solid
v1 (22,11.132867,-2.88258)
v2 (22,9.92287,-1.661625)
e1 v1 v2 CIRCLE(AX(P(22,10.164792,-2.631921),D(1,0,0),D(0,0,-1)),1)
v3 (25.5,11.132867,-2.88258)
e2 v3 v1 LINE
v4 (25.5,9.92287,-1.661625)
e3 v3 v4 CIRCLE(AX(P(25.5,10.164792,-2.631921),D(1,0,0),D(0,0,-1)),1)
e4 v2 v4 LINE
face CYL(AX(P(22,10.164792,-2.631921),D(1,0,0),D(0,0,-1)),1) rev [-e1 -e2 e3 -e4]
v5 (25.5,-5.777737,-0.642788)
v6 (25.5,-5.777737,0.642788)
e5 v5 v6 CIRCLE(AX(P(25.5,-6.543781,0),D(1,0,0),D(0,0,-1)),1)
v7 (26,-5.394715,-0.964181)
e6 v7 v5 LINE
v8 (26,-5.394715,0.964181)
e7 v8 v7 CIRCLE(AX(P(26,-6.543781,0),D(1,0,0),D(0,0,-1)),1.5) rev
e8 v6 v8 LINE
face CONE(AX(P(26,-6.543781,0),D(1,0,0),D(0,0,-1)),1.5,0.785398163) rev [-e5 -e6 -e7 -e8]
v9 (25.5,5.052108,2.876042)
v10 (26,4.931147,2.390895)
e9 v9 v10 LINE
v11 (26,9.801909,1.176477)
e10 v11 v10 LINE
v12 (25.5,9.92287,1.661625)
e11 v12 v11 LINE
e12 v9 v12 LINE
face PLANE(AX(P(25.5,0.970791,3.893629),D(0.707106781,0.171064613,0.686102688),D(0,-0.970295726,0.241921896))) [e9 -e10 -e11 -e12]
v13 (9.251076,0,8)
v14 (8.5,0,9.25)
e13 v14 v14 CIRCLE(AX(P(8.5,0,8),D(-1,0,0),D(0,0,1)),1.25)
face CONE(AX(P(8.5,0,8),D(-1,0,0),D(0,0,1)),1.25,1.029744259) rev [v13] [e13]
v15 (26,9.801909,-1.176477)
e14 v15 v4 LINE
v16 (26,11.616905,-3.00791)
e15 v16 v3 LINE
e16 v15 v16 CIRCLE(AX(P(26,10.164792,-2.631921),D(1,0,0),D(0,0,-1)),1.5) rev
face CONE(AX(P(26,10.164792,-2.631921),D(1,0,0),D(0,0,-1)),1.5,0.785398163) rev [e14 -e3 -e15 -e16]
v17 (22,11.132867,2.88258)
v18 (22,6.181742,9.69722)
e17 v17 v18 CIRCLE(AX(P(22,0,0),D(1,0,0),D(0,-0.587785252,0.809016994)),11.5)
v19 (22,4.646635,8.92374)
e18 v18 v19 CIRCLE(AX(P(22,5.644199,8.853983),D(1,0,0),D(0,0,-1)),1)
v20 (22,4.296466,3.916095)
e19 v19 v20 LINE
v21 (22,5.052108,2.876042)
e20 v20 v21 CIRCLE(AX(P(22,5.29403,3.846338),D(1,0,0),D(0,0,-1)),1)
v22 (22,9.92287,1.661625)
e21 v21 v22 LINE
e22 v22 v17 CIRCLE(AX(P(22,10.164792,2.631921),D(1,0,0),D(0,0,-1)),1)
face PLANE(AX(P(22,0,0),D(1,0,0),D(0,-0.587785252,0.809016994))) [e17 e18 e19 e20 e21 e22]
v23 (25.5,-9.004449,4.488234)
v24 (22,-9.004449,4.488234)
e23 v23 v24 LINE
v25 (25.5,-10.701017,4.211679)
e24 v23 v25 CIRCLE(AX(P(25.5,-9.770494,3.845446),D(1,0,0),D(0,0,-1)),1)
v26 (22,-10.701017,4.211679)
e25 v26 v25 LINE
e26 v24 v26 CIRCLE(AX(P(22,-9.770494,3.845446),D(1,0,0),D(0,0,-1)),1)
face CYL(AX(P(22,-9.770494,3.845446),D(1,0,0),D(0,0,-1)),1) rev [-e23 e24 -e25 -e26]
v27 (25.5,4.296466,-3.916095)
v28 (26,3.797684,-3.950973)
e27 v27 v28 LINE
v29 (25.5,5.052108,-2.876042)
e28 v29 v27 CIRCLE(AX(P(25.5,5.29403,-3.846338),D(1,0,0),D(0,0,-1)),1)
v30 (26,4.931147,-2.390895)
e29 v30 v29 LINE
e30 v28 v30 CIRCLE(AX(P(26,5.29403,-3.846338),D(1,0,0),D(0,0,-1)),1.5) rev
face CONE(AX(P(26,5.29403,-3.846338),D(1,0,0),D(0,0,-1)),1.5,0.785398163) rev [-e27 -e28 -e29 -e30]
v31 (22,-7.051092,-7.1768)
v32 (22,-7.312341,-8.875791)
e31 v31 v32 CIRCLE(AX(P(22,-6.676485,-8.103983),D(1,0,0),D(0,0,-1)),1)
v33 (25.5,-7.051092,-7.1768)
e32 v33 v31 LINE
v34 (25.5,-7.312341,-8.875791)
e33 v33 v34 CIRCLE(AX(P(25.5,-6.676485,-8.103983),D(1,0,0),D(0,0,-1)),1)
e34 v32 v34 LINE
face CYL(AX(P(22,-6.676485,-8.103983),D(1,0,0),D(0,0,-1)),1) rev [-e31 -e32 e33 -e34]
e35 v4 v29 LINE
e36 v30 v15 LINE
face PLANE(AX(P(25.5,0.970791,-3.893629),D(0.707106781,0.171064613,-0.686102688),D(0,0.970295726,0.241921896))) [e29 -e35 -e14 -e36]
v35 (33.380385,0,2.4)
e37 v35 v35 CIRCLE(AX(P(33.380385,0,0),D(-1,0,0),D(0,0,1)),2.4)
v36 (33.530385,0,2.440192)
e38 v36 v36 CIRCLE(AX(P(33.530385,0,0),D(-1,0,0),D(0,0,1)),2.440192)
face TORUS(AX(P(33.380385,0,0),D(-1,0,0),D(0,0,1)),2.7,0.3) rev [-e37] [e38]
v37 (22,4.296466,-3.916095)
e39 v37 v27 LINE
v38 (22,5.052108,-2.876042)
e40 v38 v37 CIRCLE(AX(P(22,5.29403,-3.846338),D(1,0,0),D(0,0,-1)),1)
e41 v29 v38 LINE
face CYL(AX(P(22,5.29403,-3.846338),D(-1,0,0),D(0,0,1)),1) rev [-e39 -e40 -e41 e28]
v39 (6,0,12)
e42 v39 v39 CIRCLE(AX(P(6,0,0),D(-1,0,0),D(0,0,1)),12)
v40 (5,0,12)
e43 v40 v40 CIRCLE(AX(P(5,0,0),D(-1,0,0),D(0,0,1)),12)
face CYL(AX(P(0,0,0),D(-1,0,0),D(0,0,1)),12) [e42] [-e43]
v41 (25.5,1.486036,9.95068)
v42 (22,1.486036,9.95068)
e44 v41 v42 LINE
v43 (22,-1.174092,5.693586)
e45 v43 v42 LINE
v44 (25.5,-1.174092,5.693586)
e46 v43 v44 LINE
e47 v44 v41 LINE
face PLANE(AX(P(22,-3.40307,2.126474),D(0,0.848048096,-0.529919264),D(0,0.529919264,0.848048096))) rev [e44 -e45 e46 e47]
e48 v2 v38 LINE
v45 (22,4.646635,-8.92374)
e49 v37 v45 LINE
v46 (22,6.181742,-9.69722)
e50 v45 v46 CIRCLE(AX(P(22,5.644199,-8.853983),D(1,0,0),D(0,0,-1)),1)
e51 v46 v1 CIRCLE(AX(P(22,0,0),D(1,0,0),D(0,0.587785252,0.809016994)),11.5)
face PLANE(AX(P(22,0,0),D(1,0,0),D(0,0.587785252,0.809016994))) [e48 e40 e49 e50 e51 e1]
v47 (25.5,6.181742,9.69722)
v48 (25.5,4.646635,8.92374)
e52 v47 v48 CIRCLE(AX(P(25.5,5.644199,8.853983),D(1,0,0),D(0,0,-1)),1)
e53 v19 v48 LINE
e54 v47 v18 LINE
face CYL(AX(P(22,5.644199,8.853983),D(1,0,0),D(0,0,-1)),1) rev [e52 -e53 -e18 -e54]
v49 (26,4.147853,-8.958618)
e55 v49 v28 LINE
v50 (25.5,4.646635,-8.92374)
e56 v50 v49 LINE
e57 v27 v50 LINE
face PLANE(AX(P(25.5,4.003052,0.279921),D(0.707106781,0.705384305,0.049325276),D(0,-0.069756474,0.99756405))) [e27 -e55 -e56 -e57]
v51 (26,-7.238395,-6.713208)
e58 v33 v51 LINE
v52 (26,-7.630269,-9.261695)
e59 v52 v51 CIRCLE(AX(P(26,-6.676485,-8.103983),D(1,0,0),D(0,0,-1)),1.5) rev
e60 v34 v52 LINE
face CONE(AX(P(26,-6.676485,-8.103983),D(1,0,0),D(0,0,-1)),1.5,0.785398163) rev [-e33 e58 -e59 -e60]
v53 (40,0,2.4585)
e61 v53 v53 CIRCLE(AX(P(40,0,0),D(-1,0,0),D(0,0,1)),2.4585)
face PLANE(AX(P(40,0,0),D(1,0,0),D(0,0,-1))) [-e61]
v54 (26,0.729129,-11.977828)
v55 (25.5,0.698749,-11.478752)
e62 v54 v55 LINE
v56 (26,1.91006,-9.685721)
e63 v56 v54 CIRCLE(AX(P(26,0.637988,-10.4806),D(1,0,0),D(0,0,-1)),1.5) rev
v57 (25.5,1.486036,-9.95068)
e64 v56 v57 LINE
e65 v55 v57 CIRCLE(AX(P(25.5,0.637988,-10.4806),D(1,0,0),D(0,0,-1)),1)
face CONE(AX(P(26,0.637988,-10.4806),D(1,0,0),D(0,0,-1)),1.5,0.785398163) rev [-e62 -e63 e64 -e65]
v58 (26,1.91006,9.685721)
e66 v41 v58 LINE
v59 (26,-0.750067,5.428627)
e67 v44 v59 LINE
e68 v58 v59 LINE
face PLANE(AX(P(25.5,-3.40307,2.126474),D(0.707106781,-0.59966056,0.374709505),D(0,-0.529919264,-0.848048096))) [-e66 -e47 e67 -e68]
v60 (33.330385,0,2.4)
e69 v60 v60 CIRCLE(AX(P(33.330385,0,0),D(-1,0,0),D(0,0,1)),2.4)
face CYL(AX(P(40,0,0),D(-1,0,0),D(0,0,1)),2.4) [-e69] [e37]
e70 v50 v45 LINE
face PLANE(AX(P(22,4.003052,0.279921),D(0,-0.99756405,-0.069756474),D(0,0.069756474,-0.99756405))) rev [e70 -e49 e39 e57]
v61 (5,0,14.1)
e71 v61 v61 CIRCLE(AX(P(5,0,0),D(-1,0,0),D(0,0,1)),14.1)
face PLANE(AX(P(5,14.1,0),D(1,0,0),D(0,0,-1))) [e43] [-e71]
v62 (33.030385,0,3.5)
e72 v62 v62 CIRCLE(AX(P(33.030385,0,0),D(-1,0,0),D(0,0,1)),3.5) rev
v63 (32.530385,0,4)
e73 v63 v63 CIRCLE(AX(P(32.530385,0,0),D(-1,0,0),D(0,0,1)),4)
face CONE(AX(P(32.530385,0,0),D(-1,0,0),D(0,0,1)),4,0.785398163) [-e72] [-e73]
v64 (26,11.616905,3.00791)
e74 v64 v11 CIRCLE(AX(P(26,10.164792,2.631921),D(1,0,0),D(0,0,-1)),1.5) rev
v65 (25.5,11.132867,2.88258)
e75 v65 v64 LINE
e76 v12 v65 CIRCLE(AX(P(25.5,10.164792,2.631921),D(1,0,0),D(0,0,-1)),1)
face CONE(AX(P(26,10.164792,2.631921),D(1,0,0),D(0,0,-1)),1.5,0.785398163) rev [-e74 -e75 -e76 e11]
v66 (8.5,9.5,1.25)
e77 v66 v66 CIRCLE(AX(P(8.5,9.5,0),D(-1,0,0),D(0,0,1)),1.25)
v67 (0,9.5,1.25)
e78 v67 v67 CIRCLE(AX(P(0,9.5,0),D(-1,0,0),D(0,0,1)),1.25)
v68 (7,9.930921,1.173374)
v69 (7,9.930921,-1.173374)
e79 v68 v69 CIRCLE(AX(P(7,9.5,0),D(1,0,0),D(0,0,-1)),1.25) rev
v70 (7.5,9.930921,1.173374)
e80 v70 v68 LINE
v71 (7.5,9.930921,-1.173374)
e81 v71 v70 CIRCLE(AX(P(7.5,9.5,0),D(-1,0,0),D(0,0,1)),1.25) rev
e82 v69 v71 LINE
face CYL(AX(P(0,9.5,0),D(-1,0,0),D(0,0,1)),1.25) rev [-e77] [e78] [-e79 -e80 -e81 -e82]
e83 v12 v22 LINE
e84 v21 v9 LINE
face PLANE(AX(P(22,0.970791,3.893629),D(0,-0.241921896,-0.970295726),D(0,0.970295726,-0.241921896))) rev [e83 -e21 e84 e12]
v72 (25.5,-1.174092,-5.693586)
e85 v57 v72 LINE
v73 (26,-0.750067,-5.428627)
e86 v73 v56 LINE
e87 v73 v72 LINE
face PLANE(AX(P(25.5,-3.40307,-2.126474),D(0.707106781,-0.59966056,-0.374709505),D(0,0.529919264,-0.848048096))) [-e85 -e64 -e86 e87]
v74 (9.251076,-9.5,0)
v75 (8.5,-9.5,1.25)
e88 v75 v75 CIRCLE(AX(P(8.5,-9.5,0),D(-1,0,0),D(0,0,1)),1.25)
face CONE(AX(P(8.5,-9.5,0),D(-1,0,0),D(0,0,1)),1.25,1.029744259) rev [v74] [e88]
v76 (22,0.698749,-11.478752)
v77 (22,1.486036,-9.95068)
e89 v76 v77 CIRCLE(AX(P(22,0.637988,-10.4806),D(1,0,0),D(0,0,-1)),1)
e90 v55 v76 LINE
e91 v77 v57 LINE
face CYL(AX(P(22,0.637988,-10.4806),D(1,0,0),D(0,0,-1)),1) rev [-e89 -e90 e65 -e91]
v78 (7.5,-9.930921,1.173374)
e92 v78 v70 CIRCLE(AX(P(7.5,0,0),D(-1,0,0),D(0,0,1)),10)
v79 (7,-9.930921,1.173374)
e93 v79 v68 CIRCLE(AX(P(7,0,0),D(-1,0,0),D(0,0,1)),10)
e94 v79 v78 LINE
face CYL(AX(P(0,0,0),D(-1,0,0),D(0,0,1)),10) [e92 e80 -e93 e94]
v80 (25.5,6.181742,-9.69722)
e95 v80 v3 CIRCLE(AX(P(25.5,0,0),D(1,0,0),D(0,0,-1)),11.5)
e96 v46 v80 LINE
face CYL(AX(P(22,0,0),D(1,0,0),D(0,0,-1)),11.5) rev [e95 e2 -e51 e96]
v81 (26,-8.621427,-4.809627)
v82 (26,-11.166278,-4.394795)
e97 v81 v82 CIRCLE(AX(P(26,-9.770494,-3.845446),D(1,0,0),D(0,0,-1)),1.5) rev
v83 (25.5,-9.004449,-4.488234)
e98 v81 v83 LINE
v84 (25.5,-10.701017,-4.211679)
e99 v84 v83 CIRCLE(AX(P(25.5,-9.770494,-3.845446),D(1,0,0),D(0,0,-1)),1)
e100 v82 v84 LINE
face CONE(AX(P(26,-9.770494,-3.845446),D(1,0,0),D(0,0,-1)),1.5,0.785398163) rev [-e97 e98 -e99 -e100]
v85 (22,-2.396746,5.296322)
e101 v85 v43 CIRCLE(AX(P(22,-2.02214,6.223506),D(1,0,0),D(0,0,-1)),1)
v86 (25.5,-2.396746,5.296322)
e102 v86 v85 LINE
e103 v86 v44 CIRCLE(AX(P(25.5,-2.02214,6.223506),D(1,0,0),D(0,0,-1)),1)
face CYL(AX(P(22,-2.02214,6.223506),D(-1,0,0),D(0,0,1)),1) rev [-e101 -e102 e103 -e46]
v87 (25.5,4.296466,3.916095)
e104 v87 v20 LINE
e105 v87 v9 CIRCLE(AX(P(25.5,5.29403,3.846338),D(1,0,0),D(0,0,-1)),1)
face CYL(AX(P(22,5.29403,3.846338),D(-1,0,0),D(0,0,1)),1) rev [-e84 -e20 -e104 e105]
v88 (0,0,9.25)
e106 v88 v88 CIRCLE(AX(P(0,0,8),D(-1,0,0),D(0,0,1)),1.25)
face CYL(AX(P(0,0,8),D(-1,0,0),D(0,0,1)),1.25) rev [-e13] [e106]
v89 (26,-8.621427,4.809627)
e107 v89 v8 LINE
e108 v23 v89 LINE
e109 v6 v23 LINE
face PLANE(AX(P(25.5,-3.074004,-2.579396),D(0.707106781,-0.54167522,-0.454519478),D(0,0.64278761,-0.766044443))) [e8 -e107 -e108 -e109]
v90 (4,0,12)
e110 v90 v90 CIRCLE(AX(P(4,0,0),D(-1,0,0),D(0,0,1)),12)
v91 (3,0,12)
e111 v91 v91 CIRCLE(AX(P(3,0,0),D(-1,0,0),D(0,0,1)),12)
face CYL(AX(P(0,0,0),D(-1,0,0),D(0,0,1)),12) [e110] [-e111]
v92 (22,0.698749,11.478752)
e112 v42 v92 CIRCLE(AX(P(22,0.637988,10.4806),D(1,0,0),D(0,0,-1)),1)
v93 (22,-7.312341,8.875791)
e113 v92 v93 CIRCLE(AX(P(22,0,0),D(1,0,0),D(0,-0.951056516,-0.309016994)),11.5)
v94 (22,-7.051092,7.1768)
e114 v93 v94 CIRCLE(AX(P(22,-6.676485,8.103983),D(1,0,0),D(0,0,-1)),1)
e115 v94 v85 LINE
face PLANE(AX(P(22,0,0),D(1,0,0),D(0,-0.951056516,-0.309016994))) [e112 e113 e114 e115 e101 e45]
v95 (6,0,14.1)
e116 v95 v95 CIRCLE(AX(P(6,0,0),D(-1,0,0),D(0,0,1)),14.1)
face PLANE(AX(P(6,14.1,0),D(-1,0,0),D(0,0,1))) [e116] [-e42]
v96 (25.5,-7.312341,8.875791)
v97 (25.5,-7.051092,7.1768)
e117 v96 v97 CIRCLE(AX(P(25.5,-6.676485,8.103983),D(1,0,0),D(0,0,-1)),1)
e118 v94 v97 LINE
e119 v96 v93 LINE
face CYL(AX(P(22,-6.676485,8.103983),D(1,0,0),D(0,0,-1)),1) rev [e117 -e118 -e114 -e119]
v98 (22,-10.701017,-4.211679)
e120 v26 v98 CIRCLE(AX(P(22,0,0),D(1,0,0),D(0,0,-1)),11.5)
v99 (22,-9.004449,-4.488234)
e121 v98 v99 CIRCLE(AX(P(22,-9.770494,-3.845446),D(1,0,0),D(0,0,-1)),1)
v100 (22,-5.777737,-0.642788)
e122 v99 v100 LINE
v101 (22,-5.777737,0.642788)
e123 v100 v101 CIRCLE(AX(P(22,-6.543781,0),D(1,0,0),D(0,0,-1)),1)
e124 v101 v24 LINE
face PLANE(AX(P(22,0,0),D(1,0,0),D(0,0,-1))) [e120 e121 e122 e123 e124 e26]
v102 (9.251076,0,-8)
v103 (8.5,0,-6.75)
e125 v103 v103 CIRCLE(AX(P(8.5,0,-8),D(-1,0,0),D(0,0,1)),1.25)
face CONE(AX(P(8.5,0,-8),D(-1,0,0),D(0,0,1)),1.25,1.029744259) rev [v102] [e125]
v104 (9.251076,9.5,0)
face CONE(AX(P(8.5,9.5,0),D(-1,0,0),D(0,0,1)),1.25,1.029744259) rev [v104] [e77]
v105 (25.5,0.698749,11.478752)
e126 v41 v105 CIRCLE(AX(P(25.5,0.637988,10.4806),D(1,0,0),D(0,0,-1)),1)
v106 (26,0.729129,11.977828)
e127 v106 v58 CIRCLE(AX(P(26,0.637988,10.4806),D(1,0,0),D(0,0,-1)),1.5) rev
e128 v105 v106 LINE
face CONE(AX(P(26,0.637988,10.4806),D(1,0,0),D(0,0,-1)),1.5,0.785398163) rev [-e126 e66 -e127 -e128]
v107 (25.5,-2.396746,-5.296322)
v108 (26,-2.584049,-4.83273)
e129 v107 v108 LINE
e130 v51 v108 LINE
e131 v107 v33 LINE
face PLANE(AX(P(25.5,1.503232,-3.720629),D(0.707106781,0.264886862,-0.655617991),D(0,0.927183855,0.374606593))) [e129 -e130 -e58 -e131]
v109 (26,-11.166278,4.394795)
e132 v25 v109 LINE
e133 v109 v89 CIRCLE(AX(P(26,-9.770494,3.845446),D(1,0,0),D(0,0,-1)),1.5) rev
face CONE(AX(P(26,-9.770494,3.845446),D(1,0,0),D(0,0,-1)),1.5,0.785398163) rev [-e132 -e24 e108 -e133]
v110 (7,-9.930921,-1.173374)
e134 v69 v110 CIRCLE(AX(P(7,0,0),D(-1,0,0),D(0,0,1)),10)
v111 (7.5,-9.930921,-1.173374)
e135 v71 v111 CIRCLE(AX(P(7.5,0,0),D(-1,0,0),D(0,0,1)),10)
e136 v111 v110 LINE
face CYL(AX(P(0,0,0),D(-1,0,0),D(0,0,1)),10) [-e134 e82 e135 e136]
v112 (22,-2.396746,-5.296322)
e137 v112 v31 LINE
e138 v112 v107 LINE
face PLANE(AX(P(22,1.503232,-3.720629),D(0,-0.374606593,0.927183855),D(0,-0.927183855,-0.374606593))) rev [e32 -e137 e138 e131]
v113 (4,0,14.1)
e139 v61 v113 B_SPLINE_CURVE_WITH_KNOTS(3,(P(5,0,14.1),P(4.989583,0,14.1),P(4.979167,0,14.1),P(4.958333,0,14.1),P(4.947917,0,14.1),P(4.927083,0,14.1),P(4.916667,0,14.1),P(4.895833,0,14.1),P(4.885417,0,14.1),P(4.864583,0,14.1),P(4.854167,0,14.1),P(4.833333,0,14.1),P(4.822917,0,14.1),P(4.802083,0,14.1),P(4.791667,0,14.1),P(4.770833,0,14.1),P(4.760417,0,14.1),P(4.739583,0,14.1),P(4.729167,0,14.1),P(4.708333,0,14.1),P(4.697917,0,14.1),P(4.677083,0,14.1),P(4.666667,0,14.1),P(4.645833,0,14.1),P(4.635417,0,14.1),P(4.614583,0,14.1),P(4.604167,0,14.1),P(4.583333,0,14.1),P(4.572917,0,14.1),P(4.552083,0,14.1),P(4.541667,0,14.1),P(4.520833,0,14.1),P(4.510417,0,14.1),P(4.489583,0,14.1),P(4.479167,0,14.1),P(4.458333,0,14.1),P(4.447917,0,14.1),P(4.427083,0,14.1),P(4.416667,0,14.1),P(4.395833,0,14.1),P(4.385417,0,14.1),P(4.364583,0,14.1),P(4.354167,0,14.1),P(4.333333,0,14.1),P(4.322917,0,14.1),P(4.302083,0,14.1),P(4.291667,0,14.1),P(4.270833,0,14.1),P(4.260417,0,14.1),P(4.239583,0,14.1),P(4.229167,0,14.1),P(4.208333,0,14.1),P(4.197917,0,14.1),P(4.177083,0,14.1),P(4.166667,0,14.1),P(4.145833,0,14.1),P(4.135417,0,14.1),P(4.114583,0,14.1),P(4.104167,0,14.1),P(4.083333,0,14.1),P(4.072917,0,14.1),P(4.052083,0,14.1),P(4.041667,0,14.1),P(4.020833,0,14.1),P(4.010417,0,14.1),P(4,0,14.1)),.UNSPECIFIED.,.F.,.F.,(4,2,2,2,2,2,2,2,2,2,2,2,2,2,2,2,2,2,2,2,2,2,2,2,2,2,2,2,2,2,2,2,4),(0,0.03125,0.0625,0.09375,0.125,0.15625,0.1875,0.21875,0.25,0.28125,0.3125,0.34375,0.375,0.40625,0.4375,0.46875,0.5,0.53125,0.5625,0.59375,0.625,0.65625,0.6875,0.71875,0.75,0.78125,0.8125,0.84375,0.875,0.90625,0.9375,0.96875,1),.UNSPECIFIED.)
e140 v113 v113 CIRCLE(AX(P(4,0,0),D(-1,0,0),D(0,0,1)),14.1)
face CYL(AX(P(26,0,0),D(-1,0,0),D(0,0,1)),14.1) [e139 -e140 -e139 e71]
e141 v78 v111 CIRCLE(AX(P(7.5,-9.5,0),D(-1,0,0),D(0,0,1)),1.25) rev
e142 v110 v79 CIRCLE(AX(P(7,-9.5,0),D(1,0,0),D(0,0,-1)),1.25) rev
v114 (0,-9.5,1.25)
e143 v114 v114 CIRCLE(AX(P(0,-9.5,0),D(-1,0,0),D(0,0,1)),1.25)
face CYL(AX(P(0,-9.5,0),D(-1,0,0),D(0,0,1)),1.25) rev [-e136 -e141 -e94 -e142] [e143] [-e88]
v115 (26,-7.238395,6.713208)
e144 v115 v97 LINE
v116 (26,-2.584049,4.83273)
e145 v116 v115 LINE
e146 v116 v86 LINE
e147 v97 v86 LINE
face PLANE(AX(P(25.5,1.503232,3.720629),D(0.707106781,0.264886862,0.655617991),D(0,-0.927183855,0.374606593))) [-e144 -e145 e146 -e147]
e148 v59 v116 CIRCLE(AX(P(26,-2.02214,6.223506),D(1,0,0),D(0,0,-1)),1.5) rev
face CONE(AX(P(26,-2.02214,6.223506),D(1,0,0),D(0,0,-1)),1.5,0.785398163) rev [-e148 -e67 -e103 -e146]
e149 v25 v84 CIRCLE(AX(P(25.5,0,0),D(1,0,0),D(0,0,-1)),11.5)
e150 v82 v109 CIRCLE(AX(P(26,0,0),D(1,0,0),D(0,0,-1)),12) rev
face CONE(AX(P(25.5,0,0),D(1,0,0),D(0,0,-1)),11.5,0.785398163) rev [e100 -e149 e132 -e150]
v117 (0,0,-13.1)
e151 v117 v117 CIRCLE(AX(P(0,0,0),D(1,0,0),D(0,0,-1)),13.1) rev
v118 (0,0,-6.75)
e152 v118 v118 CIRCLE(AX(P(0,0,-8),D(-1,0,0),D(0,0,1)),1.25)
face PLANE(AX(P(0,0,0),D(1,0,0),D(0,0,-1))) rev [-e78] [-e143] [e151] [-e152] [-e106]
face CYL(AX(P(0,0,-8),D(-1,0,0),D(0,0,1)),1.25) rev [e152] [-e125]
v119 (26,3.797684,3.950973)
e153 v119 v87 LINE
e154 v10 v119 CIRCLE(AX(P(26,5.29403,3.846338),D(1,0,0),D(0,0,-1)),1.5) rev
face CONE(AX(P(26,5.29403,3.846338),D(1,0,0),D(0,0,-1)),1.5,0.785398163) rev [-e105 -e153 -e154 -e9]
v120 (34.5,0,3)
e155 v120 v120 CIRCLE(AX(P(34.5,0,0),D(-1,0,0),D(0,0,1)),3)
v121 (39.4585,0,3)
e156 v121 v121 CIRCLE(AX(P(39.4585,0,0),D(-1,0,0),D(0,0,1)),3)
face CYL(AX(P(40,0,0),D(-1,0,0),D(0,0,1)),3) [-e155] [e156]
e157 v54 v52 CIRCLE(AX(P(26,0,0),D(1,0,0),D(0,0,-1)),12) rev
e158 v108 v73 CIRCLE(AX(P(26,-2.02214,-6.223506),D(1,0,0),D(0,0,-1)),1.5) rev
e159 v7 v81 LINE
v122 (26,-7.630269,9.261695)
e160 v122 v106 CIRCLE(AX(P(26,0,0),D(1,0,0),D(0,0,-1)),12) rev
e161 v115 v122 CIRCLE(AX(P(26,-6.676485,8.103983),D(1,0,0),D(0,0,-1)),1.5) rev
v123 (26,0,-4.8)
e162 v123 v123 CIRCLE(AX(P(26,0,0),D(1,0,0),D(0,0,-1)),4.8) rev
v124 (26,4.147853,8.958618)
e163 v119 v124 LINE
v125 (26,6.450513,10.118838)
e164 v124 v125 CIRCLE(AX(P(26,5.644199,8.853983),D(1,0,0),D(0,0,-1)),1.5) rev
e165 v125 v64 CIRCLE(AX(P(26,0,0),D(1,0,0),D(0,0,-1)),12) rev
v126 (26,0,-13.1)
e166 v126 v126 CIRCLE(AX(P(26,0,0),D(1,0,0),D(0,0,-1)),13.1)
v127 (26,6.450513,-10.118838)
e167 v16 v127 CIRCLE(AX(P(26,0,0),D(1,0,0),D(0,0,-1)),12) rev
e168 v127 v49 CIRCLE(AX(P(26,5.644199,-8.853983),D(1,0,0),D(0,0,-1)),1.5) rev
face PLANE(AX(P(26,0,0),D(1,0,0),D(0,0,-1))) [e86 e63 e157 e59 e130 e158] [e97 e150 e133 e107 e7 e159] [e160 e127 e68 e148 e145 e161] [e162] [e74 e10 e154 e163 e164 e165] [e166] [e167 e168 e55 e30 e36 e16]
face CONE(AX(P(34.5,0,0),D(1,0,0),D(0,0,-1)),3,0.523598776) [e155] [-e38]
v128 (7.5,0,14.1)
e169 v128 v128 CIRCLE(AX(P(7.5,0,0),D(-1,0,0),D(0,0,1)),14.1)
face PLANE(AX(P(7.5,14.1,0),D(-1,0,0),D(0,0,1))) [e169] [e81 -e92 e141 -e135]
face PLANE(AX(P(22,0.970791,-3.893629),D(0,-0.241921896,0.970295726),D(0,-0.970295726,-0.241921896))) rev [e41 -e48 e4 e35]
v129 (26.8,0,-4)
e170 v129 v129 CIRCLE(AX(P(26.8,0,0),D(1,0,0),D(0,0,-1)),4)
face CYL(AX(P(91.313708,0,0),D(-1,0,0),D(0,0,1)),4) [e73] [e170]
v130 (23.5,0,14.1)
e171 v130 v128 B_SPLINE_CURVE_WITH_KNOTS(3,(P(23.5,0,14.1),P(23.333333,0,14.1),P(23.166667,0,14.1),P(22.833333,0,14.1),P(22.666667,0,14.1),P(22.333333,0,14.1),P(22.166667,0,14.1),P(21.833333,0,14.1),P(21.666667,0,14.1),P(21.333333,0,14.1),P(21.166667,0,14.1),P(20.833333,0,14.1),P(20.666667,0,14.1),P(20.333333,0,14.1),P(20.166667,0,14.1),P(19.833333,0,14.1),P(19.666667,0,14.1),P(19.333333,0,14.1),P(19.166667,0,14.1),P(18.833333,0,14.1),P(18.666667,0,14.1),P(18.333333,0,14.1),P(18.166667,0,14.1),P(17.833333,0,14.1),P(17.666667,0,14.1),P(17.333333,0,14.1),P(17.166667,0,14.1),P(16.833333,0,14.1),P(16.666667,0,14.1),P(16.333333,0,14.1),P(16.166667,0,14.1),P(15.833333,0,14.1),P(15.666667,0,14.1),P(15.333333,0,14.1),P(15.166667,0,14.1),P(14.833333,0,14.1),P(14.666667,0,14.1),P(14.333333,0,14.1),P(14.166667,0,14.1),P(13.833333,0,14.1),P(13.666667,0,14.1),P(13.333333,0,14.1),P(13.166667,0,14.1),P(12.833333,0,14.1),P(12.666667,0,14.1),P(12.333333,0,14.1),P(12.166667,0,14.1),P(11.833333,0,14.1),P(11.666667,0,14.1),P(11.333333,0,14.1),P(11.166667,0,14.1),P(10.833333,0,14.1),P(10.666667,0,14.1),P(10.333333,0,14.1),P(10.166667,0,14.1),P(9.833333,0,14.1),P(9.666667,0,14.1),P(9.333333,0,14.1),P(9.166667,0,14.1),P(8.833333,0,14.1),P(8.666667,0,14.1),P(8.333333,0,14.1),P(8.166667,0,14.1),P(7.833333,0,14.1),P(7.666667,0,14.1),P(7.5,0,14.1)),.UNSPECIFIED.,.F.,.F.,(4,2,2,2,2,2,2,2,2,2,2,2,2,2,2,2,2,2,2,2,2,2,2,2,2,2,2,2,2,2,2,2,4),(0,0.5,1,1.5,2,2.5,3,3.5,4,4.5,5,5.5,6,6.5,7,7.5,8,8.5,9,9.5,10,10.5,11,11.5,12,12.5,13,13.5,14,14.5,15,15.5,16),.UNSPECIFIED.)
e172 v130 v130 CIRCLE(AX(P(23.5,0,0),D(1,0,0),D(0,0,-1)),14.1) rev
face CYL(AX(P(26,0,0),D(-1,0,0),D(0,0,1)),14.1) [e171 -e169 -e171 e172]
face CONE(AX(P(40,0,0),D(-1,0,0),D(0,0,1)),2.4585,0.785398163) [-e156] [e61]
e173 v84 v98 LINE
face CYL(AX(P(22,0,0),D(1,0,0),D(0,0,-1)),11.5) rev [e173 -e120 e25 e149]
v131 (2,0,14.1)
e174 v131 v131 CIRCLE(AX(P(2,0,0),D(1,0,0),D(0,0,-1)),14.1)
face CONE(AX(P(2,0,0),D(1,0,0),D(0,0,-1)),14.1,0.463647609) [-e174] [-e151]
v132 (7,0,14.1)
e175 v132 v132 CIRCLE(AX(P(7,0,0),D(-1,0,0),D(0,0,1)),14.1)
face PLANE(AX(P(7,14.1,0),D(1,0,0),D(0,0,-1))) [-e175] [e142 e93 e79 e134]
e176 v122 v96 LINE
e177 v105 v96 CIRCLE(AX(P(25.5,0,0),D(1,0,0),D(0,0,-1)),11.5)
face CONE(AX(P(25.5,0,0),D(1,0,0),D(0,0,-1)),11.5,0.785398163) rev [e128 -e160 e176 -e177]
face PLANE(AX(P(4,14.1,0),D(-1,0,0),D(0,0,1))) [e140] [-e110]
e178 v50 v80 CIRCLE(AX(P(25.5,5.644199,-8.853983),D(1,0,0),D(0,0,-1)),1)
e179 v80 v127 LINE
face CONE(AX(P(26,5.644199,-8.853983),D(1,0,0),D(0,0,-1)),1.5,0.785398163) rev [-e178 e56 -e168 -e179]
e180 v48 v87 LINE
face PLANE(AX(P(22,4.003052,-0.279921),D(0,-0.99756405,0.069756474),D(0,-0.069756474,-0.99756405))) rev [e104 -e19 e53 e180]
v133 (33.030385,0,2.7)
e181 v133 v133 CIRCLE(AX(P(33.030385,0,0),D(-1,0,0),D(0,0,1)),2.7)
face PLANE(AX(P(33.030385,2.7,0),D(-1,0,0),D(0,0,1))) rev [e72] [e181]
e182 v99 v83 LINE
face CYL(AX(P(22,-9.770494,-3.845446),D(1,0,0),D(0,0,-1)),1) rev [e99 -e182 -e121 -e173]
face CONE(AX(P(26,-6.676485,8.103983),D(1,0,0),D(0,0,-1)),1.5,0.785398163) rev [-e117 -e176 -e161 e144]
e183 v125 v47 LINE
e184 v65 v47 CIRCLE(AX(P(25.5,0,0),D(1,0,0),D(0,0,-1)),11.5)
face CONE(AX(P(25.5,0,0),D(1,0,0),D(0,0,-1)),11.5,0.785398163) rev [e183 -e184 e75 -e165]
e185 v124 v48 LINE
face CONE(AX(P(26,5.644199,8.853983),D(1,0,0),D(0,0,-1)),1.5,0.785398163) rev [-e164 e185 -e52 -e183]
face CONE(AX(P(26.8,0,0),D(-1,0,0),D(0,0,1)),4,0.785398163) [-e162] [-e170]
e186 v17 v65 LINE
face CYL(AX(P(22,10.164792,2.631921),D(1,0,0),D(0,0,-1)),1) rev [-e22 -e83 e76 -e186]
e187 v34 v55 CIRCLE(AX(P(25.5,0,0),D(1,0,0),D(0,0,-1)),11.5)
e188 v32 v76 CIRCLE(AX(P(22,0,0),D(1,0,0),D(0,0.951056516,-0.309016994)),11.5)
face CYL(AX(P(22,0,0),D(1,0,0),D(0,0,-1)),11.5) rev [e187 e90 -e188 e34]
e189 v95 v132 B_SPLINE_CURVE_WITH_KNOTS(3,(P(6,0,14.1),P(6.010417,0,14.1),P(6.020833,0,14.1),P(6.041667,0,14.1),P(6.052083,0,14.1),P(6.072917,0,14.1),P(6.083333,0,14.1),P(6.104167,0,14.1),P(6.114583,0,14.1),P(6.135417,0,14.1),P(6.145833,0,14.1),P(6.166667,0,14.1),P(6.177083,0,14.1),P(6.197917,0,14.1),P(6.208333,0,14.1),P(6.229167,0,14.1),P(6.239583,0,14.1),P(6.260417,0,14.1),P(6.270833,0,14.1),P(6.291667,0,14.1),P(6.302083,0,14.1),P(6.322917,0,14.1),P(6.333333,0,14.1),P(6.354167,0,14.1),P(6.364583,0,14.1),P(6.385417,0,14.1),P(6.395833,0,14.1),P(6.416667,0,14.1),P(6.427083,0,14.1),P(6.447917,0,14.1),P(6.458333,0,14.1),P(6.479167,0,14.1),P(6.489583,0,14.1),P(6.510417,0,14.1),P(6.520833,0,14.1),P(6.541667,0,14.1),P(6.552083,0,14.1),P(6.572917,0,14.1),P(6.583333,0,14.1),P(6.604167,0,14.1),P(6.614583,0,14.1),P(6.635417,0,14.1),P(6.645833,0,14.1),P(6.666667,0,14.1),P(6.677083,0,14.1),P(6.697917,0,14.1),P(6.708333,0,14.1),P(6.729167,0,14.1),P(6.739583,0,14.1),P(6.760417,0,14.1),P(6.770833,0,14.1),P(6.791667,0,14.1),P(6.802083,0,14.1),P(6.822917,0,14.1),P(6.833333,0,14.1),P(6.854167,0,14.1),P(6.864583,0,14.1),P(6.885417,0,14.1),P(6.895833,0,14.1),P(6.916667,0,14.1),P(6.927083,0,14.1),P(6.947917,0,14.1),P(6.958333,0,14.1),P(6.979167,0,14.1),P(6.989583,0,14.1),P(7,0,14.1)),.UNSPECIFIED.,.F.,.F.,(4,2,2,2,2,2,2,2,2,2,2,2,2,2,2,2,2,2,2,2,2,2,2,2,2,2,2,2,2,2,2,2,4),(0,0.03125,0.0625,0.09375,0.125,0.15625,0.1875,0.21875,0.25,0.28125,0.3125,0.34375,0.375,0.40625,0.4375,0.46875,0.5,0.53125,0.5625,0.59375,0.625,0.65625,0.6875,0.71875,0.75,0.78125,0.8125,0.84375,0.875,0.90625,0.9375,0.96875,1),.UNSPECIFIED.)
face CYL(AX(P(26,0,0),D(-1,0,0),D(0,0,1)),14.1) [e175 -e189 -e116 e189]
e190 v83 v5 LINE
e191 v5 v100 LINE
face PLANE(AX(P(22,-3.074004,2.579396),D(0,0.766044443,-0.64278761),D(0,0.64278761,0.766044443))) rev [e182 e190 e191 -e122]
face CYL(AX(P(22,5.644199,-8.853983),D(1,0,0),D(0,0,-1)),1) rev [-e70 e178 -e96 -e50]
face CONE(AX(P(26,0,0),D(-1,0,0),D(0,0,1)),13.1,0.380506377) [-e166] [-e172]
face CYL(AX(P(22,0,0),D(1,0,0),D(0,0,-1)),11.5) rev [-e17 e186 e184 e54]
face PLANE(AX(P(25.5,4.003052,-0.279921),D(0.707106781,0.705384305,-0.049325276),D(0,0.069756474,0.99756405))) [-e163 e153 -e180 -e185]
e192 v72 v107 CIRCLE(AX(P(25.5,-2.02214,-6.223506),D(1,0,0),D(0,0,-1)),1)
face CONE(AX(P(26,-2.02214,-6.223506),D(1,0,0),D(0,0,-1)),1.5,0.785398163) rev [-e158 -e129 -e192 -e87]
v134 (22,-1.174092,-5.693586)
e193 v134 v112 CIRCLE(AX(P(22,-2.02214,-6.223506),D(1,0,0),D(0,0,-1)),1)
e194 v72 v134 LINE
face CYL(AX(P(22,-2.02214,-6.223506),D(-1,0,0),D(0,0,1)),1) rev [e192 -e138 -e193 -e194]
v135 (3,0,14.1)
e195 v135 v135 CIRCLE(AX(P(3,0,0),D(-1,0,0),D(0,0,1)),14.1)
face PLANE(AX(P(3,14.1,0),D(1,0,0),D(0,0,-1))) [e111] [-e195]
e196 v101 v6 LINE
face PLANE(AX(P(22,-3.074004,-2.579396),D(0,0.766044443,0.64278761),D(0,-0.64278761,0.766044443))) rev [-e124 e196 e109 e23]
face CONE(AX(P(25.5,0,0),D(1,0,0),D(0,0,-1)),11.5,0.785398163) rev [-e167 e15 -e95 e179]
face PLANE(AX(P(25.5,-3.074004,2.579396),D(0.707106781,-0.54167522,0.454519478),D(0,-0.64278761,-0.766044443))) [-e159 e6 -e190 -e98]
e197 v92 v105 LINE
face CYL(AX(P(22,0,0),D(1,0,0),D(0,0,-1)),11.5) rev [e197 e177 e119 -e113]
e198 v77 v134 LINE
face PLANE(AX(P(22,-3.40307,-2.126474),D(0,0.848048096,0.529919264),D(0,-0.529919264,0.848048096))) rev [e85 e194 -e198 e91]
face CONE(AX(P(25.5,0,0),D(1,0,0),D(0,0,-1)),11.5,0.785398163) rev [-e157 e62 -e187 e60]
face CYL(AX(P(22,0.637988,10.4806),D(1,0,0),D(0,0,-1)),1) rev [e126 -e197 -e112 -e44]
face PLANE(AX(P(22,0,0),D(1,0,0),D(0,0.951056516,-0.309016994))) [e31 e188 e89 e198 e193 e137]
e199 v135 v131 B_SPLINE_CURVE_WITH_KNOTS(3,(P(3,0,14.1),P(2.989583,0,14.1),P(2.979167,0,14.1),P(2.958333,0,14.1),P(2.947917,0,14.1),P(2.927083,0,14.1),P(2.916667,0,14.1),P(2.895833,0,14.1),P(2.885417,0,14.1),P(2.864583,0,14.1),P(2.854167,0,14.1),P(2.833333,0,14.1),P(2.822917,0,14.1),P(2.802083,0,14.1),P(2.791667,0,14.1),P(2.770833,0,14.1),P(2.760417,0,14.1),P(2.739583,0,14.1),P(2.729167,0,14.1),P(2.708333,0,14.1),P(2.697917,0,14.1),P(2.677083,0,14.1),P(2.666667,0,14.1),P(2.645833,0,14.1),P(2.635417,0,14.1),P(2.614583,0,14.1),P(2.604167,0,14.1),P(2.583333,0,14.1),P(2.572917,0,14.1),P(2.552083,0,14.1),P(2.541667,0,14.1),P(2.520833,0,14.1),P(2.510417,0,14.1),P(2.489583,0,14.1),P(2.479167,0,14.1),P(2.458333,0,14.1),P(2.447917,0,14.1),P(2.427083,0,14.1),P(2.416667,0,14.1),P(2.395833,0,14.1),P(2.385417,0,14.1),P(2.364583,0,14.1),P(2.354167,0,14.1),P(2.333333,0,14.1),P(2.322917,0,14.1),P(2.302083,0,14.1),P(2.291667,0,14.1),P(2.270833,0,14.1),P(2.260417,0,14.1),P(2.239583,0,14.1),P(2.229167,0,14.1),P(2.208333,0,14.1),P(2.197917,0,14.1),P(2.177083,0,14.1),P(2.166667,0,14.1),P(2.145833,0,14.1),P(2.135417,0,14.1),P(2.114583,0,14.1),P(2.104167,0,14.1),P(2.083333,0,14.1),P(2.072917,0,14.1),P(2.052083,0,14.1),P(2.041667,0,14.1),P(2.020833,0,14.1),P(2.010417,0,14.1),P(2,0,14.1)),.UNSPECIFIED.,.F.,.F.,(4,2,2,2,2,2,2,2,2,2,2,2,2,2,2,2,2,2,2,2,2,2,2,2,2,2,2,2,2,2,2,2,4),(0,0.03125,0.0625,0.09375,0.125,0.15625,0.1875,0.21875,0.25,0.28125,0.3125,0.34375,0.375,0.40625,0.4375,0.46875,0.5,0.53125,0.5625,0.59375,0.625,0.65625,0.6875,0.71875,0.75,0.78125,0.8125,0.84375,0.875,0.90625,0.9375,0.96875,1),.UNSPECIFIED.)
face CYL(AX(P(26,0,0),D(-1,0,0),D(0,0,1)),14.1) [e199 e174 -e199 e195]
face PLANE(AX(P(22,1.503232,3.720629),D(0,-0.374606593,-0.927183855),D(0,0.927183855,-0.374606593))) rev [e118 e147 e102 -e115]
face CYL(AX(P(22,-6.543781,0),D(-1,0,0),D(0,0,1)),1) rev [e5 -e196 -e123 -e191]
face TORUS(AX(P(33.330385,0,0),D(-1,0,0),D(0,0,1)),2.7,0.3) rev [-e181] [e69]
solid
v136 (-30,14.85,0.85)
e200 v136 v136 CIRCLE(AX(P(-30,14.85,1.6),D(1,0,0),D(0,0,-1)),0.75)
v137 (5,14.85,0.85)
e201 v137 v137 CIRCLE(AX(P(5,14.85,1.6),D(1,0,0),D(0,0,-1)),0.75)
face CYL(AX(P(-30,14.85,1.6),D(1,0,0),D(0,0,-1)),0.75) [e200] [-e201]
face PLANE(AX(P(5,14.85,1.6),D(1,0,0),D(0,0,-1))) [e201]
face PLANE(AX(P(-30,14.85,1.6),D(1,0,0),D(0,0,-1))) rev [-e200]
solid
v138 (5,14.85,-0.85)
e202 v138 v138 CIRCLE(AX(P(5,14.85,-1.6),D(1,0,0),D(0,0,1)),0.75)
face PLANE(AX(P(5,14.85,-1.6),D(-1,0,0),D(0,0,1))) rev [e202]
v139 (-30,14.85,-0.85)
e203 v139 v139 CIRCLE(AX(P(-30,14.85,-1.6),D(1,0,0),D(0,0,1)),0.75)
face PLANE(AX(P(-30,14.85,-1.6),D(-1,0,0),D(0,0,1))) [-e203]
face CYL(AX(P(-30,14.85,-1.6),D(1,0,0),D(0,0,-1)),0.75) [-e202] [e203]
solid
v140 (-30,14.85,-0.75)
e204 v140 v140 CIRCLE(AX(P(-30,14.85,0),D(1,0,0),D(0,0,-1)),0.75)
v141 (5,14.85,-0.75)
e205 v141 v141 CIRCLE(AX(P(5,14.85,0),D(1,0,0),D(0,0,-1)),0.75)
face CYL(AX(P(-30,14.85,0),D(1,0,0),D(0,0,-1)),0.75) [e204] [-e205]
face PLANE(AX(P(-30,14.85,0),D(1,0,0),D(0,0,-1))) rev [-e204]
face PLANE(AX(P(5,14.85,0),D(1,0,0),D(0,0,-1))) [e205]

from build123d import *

# Parameters (mm, degrees)
SKETCH_1_R                       = 14.1
EXTRUDE_1_DEPTH                  = 26
SKETCH_2_R                       = 4
EXTRUDE_2_DEPTH                  = 14
CHAMFER1_SIZE                    = 0.8
CHAMFER4_SIZE                    = 0.5
HOLE_WIZARD_M3_1_D               = 2.5
HOLE_WIZARD_M3_1_DEPTH           = 8.5
HOLE_WIZARD_M3_1_TIP             = 0.751075774
CHAMFER_1_SIZE                   = 2.5
CHAMFER_1_SIZE2                  = 1
CUT_EXTRUDE_1_DEPTH              = 4
FILLET_1_R                       = 1
PATTERN_CIRCULAR_1_COUNT         = 5
FILLET_1_OF_PATTERN_CIRCULAR_1_R = 1
CHAMFER2_SIZE                    = 0.5
SKETCH2_W                        = 0.5
SKETCH2_H                        = 4.1
SKETCH2_W_2                      = 1
SKETCH2_H_2                      = 2.1
CHAMFER3_SIZE                    = 1
CHAMFER3_SIZE2                   = 2
EXTRUDE_3_DEPTH                  = 5
EXTRUDE_3_DEPTH_BACK             = 30
SKETCH_9_R                       = 0.75
EXTRUDE_3_2_DEPTH                = 5
EXTRUDE_3_2_DEPTH_BACK           = 30
EXTRUDE_3_3_DEPTH                = 5
EXTRUDE_3_3_DEPTH_BACK           = 30


# Read off the part's stored shape, not the designer's step: M6 Machine Threads Stud1
with BuildPart() as part:
    # 草图1 → 凸台-拉伸1 (new body)
    with BuildSketch(Plane(origin=(0, 0, 0), x_dir=(0, 0, -1), z_dir=(1, 0, 0))):
        with Locations(Location((0, 0, 0), (0, 0, 180))):
            Circle(SKETCH_1_R)
    extrude(amount=EXTRUDE_1_DEPTH)

    # 草图2 → 凸台-拉伸2 (add)
    with BuildSketch(Plane(origin=(26, 0, 0), x_dir=(0, 0, -1), z_dir=(1, 0, 0))):
        Circle(SKETCH_2_R)
    extrude(amount=EXTRUDE_2_DEPTH)

    # M6 Machine Threads Stud1 outline → M6 Machine Threads Stud1 (revolve, cut)
    with BuildSketch(Plane.YX):
        with BuildLine():
            Line((4, 40), (2.4585, 40))
            Line((2.4585, 40), (3, 39.4585))
            Line((3, 39.4585), (3, 34.5))
            Line((3, 34.5), (2.440192379, 33.530384758))
            ThreePointArc((2.440192379, 33.530384758), (2.410222252, 33.458030472), (2.4, 33.380384758))
            Line((2.4, 33.380384758), (2.4, 33.330384758))
            ThreePointArc((2.4, 33.330384758), (2.487867965, 33.118252723), (2.7, 33.030384758))
            Line((2.7, 33.030384758), (4, 33.030384758))
            Line((4, 33.030384758), (4, 40))
        make_face()
    revolve(axis=Axis((0, 0, 0), (1, 0, 0)), mode=Mode.SUBTRACT)

    # Chamfer1
    chamfer1_edges = [part.edges().sort_by_distance(p)[0] for p in [
        (26, 0, 4),
    ]]
    chamfer(chamfer1_edges, length=CHAMFER1_SIZE)

    # Chamfer4
    chamfer4_edges = [part.edges().sort_by_distance(p)[0] for p in [
        (33.030384758, 0, 4),
    ]]
    chamfer(chamfer4_edges, length=CHAMFER4_SIZE)

    # M3 螺纹孔1
    with Locations(Plane.ZY):
        with Locations((8, 0), (0, 9.5), (0, -9.5), (-8, 0)):
            Hole(HOLE_WIZARD_M3_1_D / 2, depth=HOLE_WIZARD_M3_1_DEPTH)
            with Locations((0, 0, -(HOLE_WIZARD_M3_1_DEPTH + HOLE_WIZARD_M3_1_TIP / 2))):  # 118° drill point
                Cone(0, HOLE_WIZARD_M3_1_D / 2, HOLE_WIZARD_M3_1_TIP, mode=Mode.SUBTRACT)

    # 倒角1
    chamfer_1_edges = [part.edges().sort_by_distance(p)[0] for p in [
        (26, 0, -14.1),
    ]]
    chamfer_1_side = [part.faces().sort_by_distance(p)[0] for p in [
        (13, 0, -14.1),
    ]]
    chamfer(chamfer_1_edges, length=CHAMFER_1_SIZE, length2=CHAMFER_1_SIZE2, reference=chamfer_1_side[0])

    # 草图8 → 切除-拉伸1 (cut)
    with BuildSketch(Plane(origin=(26, 0, 0), x_dir=(0, 0, -1), z_dir=(1, 0, 0))):
        with BuildLine():
            Line((0, -5.238373922), (-5.676389324, -10.00143011))
            ThreePointArc((-5.676389324, -10.00143011), (0, -11.5), (5.676389324, -10.00143011))
            Line((5.676389324, -10.00143011), (0, -5.238373922))
        make_face()
    cut_extrude_1 = extrude(amount=-CUT_EXTRUDE_1_DEPTH, mode=Mode.SUBTRACT)

    # 圆角1
    fillet_1_edges = [part.edges().sort_by_distance(p)[0] for p in [
        (24, -10.00143011, 5.676389324),
        (24, -5.238373922, 0),
        (24, -10.00143011, -5.676389324),
    ]]
    fillet(fillet_1_edges, radius=FILLET_1_R)

    # 阵列(圆周)1: 切除-拉伸1 ×5 about axis
    pattern_circular_1_axis = Axis((0, 0, 0), (1, 0, 0))
    for i in range(1, PATTERN_CIRCULAR_1_COUNT):
        add(cut_extrude_1.rotate(pattern_circular_1_axis, i * 360 / PATTERN_CIRCULAR_1_COUNT), mode=Mode.SUBTRACT)

    # 圆角1 of 阵列(圆周)1
    fillet_1_of_pattern_circular_1_edges = [part.edges().sort_by_distance(p)[0] for p in [
        (24, -8.489178927, -7.757824511),
        (24, -1.618746565, -4.981989654),
        (24, 2.307955183, -11.266026046),
        (24, 4.754828997, -10.47098855),
        (24, 4.237933526, -3.079038938),
        (24, 11.427824858, -1.286397691),
        (24, 11.427824858, 1.286397691),
        (24, 4.237933526, 3.079038938),
        (24, 4.754828997, 10.47098855),
        (24, 2.307955183, 11.266026046),
        (24, -1.618746565, 4.981989654),
        (24, -8.489178927, 7.757824511),
    ]]
    fillet(fillet_1_of_pattern_circular_1_edges, radius=FILLET_1_OF_PATTERN_CIRCULAR_1_R)

    # Chamfer2
    chamfer2_edges = [part.edges().sort_by_distance(p)[0] for p in [
        (26, 0.155972278, 7.822133498),
        (26, -4.723918935, 6.236560727),
        (26, -3.553695435, 10.937149937),
        (26, -1.713122608, 5.272449246),
        (26, 1.526939092, 10.938601831),
        (26, -7.664868512, 7.952002496),
        (26, 7.487489119, 2.268833731),
        (26, 4.471550488, 6.419917137),
        (26, 9.303695435, 6.759530401),
        (26, 4.485013213, 3.258552838),
        (26, 10.875078679, 1.928008487),
        (26, 5.194229162, 9.747027055),
        (26, 4.471550488, -6.419917137),
        (26, 7.487489119, -2.268833731),
        (26, 9.303695435, -6.759530401),
        (26, 4.485013213, -3.258552838),
        (26, 5.194229162, -9.747027055),
        (26, 10.875078679, -1.928008487),
        (26, -4.723918935, -6.236560727),
        (26, 0.155972278, -7.822133498),
        (26, -3.553695435, -10.937149937),
        (26, -1.713122608, -5.272449246),
        (26, -7.664868512, -7.952002496),
        (26, 1.526939092, -10.938601831),
        (26, -7.39109295, 2.565510635),
        (26, -7.39109295, -2.565510635),
        (26, -11.5, 0),
        (26, -5.543781212, 0),
        (26, -9.931378421, 4.832419234),
        (26, -9.931378421, -4.832419234),
    ]]
    chamfer(chamfer2_edges, length=CHAMFER2_SIZE)

    # Sketch2 → Cut-Revolve1 (revolve, cut)
    with BuildSketch(Plane.XY, mode=Mode.PRIVATE) as cut_revolve1_sk:
        with Locations((7.25, 12.05)):
            Rectangle(SKETCH2_W, SKETCH2_H)
        with Locations((3.5, 13.05)):
            Rectangle(SKETCH2_W_2, SKETCH2_H_2)
        with Locations((5.5, 13.05)):
            Rectangle(SKETCH2_W_2, SKETCH2_H_2)
    revolve(cut_revolve1_sk.sketch.rotate(Axis((0, 0, 0), (1, 0, 0)), 90), axis=Axis((0, 0, 0), (1, 0, 0)), mode=Mode.SUBTRACT)

    # Chamfer3
    chamfer3_edges = [part.edges().sort_by_distance(p)[0] for p in [
        (0, 0, -14.1),
    ]]
    chamfer3_side = [part.faces().sort_by_distance(p)[0] for p in [
        (0, 0, 0),
    ]]
    chamfer(chamfer3_edges, length=CHAMFER3_SIZE, length2=CHAMFER3_SIZE2, reference=chamfer3_side[0])


with BuildPart() as body_2:
    # 草图9 → 凸台-拉伸3 (new, two sides: drawn at the far end of the back side and taken through both)
    with BuildSketch(Plane(origin=(0, 0, 0), x_dir=(0, 0, -1), z_dir=(1, 0, 0)).offset(-EXTRUDE_3_DEPTH_BACK)):
        with Locations((0, 14.85)):
            Circle(SKETCH_9_R)
    extrude(amount=EXTRUDE_3_DEPTH + EXTRUDE_3_DEPTH_BACK)


with BuildPart() as body_3:
    # 草图9 → Extrude 3 2 (new, two sides: drawn at the far end of the back side and taken through both)
    with BuildSketch(Plane(origin=(0, 0, 0), x_dir=(0, 0, -1), z_dir=(1, 0, 0)).offset(-EXTRUDE_3_2_DEPTH_BACK)):
        with Locations((-1.6, 14.85)):
            Circle(SKETCH_9_R)
    extrude(amount=EXTRUDE_3_2_DEPTH + EXTRUDE_3_2_DEPTH_BACK)


with BuildPart() as body_4:
    # 草图9 → Extrude 3 3 (new, two sides: drawn at the far end of the back side and taken through both)
    with BuildSketch(Plane(origin=(0, 0, 0), x_dir=(0, 0, -1), z_dir=(1, 0, 0)).offset(-EXTRUDE_3_3_DEPTH_BACK)):
        with Locations(Location((1.6, 14.85, 0), (0, 0, 180))):
            Circle(SKETCH_9_R)
    extrude(amount=EXTRUDE_3_3_DEPTH + EXTRUDE_3_3_DEPTH_BACK)


solid = Compound([part.part, body_2.part, body_3.part, body_4.part])
